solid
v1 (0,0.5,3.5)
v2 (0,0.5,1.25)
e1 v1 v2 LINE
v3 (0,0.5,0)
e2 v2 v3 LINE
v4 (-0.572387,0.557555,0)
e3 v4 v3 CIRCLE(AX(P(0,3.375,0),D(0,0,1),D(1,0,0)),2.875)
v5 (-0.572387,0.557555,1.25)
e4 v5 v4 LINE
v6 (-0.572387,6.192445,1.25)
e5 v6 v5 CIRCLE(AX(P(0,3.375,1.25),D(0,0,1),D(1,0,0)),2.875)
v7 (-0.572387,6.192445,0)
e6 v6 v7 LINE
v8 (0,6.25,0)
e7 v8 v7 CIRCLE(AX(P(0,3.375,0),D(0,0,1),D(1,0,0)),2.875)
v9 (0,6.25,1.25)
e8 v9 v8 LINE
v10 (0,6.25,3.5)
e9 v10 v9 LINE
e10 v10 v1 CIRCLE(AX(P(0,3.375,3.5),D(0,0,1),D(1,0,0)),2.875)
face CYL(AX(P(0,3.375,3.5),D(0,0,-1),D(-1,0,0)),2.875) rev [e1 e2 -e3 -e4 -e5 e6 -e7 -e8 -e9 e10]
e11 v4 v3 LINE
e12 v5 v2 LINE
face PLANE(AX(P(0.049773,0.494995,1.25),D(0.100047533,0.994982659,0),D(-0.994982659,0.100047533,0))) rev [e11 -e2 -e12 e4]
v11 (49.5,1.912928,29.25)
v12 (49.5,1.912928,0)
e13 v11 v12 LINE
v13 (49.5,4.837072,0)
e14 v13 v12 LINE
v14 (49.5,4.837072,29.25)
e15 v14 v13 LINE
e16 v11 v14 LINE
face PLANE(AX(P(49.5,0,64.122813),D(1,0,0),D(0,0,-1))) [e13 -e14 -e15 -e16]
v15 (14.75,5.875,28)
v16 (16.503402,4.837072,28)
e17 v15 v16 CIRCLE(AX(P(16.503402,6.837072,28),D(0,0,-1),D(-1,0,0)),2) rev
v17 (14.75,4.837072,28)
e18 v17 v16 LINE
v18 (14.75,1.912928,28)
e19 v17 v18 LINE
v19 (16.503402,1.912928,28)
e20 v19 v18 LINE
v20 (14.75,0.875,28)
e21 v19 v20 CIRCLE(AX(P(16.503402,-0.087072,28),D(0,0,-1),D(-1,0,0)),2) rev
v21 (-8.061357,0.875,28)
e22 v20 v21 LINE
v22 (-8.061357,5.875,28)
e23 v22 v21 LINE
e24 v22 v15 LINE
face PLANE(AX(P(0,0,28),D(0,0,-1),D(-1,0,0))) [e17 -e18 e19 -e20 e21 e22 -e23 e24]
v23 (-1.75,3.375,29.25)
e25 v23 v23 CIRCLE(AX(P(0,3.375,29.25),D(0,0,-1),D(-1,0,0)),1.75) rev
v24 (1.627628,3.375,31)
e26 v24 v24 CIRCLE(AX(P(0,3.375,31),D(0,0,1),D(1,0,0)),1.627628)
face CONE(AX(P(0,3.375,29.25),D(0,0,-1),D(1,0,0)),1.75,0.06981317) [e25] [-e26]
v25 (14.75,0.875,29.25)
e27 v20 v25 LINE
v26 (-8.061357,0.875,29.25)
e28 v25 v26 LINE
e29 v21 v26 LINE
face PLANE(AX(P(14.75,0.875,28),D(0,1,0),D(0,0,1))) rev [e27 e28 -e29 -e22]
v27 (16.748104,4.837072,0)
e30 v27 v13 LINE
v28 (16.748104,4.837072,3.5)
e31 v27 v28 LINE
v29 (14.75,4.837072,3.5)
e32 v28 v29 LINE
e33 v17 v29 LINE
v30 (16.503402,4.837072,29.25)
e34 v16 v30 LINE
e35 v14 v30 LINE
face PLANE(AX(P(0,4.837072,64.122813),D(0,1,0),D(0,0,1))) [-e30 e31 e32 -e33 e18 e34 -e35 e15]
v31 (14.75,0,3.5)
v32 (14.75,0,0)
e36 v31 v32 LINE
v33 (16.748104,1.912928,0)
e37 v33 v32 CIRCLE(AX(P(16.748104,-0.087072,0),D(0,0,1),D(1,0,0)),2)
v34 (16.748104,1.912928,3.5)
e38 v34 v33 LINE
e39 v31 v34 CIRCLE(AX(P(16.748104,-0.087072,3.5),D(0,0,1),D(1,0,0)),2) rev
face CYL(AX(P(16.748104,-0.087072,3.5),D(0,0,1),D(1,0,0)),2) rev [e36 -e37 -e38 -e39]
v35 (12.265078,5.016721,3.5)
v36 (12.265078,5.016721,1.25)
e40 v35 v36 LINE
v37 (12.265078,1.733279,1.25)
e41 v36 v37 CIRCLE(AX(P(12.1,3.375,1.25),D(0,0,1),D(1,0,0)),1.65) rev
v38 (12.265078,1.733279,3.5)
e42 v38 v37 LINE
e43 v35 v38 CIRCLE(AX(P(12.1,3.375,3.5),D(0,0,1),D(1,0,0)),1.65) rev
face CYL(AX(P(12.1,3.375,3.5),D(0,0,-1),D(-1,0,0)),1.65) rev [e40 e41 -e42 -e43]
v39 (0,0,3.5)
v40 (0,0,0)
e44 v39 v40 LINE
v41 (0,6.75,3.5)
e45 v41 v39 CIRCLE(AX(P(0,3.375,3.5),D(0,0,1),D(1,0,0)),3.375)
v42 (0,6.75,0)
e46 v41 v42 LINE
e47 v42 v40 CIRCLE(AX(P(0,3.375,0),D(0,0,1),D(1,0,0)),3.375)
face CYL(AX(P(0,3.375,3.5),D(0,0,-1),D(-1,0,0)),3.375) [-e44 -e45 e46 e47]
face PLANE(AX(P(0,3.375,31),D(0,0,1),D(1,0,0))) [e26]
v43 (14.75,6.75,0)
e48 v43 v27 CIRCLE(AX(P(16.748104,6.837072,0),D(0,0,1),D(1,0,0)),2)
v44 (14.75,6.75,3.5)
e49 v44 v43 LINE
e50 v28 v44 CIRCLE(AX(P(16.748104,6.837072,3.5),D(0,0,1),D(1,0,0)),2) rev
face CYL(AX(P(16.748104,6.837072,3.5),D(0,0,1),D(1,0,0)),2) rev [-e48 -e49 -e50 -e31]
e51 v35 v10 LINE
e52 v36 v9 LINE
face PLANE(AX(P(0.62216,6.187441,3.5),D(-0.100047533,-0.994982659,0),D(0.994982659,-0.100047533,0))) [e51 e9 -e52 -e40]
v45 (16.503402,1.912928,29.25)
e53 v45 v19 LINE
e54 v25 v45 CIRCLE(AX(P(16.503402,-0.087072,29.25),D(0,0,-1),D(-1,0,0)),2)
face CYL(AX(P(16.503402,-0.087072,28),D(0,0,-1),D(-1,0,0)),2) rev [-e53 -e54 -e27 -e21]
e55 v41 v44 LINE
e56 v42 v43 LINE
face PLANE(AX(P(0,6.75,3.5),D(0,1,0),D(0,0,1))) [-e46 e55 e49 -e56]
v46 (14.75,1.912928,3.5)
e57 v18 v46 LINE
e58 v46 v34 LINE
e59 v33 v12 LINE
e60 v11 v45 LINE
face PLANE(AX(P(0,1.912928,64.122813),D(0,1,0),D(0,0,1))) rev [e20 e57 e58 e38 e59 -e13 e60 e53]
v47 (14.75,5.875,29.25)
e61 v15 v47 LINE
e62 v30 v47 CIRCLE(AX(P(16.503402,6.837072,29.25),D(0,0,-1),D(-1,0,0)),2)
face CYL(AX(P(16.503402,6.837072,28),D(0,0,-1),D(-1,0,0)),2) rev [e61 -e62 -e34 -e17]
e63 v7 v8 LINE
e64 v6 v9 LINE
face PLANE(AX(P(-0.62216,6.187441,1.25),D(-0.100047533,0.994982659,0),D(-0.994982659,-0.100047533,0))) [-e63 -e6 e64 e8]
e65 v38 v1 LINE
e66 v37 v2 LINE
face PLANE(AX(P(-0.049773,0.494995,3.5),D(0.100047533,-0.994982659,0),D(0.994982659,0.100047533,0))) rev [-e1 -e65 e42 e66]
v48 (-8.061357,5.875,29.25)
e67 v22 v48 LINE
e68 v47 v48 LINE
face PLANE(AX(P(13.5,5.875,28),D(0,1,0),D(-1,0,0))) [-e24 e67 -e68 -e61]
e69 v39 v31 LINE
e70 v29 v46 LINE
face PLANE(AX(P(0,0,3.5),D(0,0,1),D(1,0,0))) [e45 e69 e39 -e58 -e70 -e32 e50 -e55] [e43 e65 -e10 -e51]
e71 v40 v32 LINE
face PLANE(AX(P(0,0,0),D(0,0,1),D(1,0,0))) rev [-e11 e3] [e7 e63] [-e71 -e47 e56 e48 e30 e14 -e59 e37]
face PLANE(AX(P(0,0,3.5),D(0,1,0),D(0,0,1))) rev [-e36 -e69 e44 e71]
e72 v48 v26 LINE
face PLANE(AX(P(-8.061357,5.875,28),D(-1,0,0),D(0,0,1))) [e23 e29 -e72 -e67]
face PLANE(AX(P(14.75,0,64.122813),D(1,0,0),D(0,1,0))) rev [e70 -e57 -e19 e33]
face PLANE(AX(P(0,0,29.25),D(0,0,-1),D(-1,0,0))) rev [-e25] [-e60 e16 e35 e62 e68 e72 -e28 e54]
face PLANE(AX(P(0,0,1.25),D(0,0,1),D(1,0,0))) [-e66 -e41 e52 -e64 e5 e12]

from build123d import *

# Parameters (mm, degrees)
BOSS_EXTRUDE10_DEPTH = 3.5
BOSS_EXTRUDE15_DEPTH = 1.25
SKETCH1_17_W         = 34.75
SKETCH1_17_H         = 2.924143722
BOSS_EXTRUDE17_DEPTH = 29.25
BOSS_EXTRUDE18_DEPTH = 1.25
SKETCH2_9_R          = 1.75
BOSS_EXTRUDE19_DEPTH = 1.75
BOSS_EXTRUDE19_TAPER = 4
FILLET1_R            = 2


with BuildPart() as part:
    # Sketch1 → Boss-Extrude10 (new body)
    with BuildSketch(Plane.XY):
        with BuildLine():
            ThreePointArc((0, 6.75), (-3.375, 3.375), (0, 0))
            Line((0, 0), (14.75, 0))
            Line((14.75, 0), (14.75, 6.75))
            Line((14.75, 6.75), (0, 6.75))
        make_face()
        with BuildLine():
            ThreePointArc((0, 0.5), (-2.875, 3.375), (0, 6.25))
            Line((0, 6.25), (12.265078429, 5.016721387))
            ThreePointArc((12.265078429, 5.016721387), (13.75, 3.375), (12.265078429, 1.733278613))
            Line((12.265078429, 1.733278613), (0, 0.5))
        make_face(mode=Mode.SUBTRACT)
    extrude(amount=BOSS_EXTRUDE10_DEPTH)

    # Sketch1<16> → Boss-Extrude15 (add)
    with BuildSketch(Plane.XY):
        with BuildLine():
            Line((0, 6.25), (-0.57238697, 6.192445325))
            ThreePointArc((-0.57238697, 6.192445325), (-2.875, 3.375), (-0.57238697, 0.557554675))
            Line((-0.57238697, 0.557554675), (0, 0.5))
            Line((0, 0.5), (12.265078429, 1.733278613))
            ThreePointArc((12.265078429, 1.733278613), (13.75, 3.375), (12.265078429, 5.016721387))
            Line((12.265078429, 5.016721387), (0, 6.25))
        make_face()
    extrude(amount=BOSS_EXTRUDE15_DEPTH)

    # Sketch1<17> → Boss-Extrude17 (add)
    with BuildSketch(Plane.XY):
        with Locations((32.125, 3.375)):
            Rectangle(SKETCH1_17_W, SKETCH1_17_H)
    extrude(amount=BOSS_EXTRUDE17_DEPTH)

    # Sketch2 → Boss-Extrude18 (add)
    with BuildSketch(Plane.XY.offset(29.25)):
        Polygon((13.5, 5.875), (-8.061356684, 5.875), (-8.061356684, 0.875), (14.75, 0.875), (14.75, 5.875), align=None)
    extrude(amount=-BOSS_EXTRUDE18_DEPTH)

    # Sketch2<9> → Boss-Extrude19 (add)
    with BuildSketch(Plane.XY.offset(29.25)):
        with Locations((0, 3.375)):
            Circle(SKETCH2_9_R)
    extrude(amount=BOSS_EXTRUDE19_DEPTH, taper=BOSS_EXTRUDE19_TAPER)

    # Fillet1
    # the kernel refuses this fillet: 2 mm, written as the material it adds along each edge
    with BuildSketch(Plane(origin=(14.75, 1.912928139, 0), x_dir=(0, -1, 0), z_dir=(0, 0, 1))) as fillet1_piece_1:
        with BuildLine():
            CenterArc((2, 1.998103724), FILLET1_R, 180, 87.504786267)
            Line((0, 1.998103724), (0, 0))
            Line((0, 0), (1.912928139, 0))
        make_face()
    extrude(amount=3.5)
    with BuildSketch(Plane(origin=(14.75, 4.837071861, 0), x_dir=(1, 0, 0), z_dir=(0, 0, 1))) as fillet1_piece_2:
        with BuildLine():
            CenterArc((1.998103724, 2), FILLET1_R, 182.495213733, 87.504786267)
            Line((0, 1.912928139), (0, 0))
            Line((0, 0), (1.998103724, 0))
        make_face()
    extrude(amount=3.5)
    with BuildSketch(Plane(origin=(14.75, 1.912928139, 28), x_dir=(1, 0, 0), z_dir=(0, 0, 1))) as fillet1_piece_3:
        with BuildLine():
            CenterArc((1.753401761, -2), FILLET1_R, 90, 61.246917848)
            Line((0, -1.037928139), (0, 0))
            Line((0, 0), (1.753401761, 0))
        make_face()
    extrude(amount=1.25)
    with BuildSketch(Plane(origin=(14.75, 4.837071861, 28), x_dir=(1, 0, 0), z_dir=(0, 0, 1))) as fillet1_piece_4:
        with BuildLine():
            CenterArc((1.753401761, 2), FILLET1_R, 208.753082152, 61.246917848)
            Line((0, 1.037928139), (0, 0))
            Line((0, 0), (1.753401761, 0))
        make_face()
    extrude(amount=1.25)


solid = part.part
